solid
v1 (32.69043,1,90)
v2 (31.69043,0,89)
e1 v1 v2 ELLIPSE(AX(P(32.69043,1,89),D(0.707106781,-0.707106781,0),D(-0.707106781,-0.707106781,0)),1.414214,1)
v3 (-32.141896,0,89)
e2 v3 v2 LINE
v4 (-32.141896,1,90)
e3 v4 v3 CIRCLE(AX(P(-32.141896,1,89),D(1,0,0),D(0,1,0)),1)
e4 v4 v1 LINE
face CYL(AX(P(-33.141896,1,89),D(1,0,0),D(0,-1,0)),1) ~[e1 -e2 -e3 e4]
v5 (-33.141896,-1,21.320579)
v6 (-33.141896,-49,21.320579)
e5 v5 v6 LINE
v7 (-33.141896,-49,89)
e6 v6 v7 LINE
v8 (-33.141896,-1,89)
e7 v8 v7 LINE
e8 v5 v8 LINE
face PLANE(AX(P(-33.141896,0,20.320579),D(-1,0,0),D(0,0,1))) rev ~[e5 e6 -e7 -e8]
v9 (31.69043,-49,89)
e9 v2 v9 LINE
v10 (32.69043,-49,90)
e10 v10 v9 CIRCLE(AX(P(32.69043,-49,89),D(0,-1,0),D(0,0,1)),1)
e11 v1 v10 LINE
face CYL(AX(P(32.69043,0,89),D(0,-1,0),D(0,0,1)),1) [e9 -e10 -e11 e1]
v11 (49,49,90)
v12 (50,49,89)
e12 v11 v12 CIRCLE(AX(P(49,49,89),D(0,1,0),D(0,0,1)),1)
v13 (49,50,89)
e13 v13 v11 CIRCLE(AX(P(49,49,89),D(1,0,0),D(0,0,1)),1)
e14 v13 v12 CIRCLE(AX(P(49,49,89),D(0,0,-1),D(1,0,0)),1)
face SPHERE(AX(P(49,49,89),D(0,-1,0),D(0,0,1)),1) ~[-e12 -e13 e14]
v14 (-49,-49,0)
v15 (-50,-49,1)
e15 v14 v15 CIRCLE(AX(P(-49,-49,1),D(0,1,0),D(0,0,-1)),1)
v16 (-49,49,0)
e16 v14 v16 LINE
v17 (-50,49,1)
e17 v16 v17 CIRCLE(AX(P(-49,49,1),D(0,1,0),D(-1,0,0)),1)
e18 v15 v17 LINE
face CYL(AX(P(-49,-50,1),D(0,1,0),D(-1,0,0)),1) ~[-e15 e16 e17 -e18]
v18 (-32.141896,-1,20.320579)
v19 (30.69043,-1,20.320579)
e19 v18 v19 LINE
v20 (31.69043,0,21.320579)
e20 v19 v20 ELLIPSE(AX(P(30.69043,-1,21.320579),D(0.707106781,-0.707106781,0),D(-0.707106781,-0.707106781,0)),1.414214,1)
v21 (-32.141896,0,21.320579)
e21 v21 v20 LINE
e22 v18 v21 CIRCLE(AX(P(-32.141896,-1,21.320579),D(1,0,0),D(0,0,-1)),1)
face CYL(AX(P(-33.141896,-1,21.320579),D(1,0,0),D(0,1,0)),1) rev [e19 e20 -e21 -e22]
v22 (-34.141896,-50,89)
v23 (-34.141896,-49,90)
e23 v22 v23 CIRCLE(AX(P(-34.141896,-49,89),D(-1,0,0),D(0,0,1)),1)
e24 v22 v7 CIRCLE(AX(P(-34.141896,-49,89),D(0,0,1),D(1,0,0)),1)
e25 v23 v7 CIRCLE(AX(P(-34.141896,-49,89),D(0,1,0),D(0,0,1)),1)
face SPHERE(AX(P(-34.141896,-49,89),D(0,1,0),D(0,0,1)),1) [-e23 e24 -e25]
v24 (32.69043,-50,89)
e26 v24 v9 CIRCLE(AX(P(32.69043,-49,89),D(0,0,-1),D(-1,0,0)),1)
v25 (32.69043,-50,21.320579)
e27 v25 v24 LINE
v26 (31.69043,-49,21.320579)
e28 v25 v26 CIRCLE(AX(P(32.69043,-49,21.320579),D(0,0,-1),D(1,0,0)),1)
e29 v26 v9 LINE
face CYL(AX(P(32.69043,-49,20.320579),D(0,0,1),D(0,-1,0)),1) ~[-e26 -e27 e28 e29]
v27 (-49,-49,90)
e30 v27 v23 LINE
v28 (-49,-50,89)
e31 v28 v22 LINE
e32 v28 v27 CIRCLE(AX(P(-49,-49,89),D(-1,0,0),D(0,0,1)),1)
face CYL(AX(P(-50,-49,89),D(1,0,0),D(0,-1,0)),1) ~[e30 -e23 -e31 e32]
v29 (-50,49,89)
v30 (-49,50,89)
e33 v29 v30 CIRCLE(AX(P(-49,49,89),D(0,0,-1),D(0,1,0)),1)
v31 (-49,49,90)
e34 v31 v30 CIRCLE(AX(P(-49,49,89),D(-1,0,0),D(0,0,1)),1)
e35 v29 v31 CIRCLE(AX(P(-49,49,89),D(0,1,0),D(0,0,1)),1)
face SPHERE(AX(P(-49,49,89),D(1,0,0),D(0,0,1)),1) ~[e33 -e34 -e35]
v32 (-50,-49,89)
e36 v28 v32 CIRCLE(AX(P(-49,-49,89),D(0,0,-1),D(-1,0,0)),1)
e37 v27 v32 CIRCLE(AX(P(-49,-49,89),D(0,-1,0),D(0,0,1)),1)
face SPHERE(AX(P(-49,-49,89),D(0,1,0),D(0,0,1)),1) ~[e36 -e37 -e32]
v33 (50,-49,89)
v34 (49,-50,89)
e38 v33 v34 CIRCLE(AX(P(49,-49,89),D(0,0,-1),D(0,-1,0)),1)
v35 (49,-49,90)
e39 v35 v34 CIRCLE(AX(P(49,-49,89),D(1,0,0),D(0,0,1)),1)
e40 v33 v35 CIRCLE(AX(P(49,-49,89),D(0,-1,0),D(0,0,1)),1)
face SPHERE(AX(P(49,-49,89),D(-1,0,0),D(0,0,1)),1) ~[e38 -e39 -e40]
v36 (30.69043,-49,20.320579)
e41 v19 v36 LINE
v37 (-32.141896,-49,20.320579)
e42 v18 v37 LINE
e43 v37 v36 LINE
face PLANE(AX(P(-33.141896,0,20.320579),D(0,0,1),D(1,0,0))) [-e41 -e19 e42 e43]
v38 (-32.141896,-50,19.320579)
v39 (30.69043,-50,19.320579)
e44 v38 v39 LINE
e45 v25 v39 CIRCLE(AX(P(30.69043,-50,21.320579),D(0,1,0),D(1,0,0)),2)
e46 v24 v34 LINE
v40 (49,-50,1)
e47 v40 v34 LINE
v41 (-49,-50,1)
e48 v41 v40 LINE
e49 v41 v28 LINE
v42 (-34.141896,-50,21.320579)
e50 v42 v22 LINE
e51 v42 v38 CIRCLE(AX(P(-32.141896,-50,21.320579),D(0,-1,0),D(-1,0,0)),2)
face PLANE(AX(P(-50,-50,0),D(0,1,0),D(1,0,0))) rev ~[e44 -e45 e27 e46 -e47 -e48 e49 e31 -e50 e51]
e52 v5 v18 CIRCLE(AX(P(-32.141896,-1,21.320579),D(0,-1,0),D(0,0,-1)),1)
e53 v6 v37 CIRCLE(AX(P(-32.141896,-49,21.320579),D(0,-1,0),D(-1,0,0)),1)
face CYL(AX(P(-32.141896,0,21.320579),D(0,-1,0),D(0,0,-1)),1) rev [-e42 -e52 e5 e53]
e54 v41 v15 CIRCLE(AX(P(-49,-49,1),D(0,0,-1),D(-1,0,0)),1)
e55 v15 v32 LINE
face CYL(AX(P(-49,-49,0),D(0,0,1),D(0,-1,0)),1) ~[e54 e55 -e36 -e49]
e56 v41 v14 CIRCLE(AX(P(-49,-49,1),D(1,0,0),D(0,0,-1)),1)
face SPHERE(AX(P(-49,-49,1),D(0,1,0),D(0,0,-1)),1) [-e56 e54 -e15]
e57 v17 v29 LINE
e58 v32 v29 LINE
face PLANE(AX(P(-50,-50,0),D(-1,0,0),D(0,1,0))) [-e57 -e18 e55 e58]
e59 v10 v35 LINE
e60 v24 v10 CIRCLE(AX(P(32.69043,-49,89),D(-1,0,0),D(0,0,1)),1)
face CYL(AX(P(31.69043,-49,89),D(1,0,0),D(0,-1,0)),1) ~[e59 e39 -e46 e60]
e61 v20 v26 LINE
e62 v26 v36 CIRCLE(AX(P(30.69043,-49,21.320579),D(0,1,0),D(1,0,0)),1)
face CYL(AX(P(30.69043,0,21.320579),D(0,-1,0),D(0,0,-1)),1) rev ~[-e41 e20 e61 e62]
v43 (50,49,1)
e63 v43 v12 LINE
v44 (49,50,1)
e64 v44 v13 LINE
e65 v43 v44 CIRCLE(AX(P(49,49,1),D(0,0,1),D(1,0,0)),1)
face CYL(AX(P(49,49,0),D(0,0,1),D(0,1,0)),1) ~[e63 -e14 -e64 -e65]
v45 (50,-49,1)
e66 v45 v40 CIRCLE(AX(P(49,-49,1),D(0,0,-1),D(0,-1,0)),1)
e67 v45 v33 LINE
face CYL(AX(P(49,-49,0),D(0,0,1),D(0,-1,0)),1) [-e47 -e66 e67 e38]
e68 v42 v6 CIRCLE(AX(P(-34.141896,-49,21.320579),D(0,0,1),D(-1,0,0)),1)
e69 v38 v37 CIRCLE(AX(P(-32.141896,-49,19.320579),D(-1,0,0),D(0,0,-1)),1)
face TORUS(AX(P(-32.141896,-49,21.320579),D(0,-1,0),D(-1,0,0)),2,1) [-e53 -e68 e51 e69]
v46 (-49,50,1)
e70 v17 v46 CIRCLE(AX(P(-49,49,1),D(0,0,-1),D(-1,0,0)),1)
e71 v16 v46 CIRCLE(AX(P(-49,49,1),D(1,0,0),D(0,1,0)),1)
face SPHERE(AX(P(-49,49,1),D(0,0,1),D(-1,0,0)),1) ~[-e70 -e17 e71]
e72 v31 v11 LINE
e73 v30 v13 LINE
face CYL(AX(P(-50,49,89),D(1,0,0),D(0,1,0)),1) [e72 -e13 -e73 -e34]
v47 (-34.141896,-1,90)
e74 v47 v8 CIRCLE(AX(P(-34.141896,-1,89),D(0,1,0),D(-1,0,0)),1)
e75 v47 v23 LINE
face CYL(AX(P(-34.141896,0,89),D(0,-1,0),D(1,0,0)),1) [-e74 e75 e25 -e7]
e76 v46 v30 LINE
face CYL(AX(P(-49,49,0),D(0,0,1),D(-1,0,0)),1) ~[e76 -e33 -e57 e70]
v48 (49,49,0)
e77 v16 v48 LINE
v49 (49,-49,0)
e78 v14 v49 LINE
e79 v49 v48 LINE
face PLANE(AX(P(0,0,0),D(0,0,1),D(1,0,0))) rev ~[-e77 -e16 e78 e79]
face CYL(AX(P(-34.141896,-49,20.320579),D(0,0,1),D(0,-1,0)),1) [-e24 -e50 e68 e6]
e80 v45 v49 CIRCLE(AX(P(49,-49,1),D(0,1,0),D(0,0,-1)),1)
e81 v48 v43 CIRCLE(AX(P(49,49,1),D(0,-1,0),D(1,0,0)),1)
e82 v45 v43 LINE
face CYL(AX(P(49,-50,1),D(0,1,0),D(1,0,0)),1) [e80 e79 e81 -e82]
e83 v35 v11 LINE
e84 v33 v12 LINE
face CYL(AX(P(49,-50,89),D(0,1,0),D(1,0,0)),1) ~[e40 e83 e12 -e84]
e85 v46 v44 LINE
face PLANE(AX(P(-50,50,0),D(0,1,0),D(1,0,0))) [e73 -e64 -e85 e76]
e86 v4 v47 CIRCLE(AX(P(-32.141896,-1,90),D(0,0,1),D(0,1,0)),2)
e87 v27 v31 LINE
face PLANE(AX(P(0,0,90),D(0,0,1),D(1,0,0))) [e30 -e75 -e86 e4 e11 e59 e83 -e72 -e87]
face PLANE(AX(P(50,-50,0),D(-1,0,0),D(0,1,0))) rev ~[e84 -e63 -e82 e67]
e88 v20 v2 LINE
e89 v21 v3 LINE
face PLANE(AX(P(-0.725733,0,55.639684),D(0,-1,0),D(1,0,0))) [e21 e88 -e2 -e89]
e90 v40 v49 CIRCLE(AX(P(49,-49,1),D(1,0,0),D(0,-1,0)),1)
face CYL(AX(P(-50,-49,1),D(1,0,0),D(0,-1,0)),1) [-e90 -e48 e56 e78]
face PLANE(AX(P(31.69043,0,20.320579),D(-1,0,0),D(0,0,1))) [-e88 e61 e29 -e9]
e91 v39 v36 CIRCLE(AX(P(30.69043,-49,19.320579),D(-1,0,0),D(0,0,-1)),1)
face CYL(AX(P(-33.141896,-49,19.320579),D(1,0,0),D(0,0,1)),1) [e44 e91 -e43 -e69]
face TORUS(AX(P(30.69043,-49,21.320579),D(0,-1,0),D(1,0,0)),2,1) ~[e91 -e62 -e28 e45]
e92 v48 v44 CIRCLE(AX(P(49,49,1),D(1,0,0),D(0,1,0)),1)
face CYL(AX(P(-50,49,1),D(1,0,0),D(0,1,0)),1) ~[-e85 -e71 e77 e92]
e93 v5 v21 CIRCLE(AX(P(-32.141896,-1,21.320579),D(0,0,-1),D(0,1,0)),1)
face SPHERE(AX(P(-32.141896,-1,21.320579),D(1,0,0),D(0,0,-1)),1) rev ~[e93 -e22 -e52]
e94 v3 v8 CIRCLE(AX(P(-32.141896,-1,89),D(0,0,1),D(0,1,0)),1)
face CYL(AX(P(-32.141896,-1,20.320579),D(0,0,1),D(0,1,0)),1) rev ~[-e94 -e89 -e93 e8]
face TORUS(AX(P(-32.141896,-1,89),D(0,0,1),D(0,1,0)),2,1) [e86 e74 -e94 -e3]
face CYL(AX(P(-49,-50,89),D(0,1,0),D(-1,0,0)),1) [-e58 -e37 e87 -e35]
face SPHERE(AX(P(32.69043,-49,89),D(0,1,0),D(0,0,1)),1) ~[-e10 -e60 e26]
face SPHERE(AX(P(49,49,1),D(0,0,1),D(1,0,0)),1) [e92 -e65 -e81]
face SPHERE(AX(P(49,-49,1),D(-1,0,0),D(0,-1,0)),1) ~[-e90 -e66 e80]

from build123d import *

# Parameters (mm, degrees)
F0_W     = 100
F0_H     = 100
F1_DEPTH = 90
F2_W     = 64.8323260248
F2_H     = 70.6382095814
F3_DEPTH = 50
F4_W     = 65.3021298349
F4_H     = 31.1890766025
F5_DEPTH = 25
F6_DEPTH = 50
F8_R     = 1


# Not quite as in the source:
# - a feature of the source that left no trace in its solid (it failed there, or was rolled back) is left out


with BuildPart() as f1:
    # F0 (on Top) → F1 (new body)
    with BuildSketch(Plane.XY):
        Rectangle(F0_W, F0_H)
    extrude(amount=F1_DEPTH)

    # F2 (on Front) → F3 (cut)
    with BuildSketch(Plane.XZ):
        with Locations((-0.7257331163, 55.6396842003)):
            Rectangle(F2_W, F2_H)
    extrude(amount=F3_DEPTH, mode=Mode.SUBTRACT)

    # F4 (on Top) → F5 (join)
    with BuildSketch(Plane.XY):
        with Locations((-0.2436619252, 15.5945383012)):
            Rectangle(F4_W, F4_H)
    extrude(amount=F5_DEPTH)

    # F4 (on Top) → F6 (join)
    with BuildSketch(Plane.XY):
        with Locations((-0.2436619252, 15.5945383012)):
            Rectangle(F4_W, F4_H)
    extrude(amount=F6_DEPTH)

    # F8
    f8_edges = [f1.edges().sort_by_distance(p)[0] for p in [
        (-33.141896, -25, 90),
        (31.69043, -25, 90),
        (40.845215, -50, 90),
        (50, 0, 90),
        (0, 50, 90),
        (-50, 0, 90),
        (-50, 50, 45),
        (-50, 0, 0),
        (-41.570948, -50, 90),
        (-33.141896, -50, 55.16029),
        (0, -50, 0),
        (-0.725733, -50, 20.320579),
        (31.69043, -25, 20.320579),
        (31.69043, -50, 55.16029),
        (50, -50, 45),
        (-0.725733, 0, 20.320579),
        (-33.141896, -25, 20.320579),
        (-33.141896, 0, 55.16029),
        (-50, -50, 45),
        (50, 50, 45),
        (50, 0, 0),
        (0, 50, 0),
        (-0.725733, 0, 90),
    ]]
    fillet(f8_edges, radius=F8_R)


solid = f1.part
